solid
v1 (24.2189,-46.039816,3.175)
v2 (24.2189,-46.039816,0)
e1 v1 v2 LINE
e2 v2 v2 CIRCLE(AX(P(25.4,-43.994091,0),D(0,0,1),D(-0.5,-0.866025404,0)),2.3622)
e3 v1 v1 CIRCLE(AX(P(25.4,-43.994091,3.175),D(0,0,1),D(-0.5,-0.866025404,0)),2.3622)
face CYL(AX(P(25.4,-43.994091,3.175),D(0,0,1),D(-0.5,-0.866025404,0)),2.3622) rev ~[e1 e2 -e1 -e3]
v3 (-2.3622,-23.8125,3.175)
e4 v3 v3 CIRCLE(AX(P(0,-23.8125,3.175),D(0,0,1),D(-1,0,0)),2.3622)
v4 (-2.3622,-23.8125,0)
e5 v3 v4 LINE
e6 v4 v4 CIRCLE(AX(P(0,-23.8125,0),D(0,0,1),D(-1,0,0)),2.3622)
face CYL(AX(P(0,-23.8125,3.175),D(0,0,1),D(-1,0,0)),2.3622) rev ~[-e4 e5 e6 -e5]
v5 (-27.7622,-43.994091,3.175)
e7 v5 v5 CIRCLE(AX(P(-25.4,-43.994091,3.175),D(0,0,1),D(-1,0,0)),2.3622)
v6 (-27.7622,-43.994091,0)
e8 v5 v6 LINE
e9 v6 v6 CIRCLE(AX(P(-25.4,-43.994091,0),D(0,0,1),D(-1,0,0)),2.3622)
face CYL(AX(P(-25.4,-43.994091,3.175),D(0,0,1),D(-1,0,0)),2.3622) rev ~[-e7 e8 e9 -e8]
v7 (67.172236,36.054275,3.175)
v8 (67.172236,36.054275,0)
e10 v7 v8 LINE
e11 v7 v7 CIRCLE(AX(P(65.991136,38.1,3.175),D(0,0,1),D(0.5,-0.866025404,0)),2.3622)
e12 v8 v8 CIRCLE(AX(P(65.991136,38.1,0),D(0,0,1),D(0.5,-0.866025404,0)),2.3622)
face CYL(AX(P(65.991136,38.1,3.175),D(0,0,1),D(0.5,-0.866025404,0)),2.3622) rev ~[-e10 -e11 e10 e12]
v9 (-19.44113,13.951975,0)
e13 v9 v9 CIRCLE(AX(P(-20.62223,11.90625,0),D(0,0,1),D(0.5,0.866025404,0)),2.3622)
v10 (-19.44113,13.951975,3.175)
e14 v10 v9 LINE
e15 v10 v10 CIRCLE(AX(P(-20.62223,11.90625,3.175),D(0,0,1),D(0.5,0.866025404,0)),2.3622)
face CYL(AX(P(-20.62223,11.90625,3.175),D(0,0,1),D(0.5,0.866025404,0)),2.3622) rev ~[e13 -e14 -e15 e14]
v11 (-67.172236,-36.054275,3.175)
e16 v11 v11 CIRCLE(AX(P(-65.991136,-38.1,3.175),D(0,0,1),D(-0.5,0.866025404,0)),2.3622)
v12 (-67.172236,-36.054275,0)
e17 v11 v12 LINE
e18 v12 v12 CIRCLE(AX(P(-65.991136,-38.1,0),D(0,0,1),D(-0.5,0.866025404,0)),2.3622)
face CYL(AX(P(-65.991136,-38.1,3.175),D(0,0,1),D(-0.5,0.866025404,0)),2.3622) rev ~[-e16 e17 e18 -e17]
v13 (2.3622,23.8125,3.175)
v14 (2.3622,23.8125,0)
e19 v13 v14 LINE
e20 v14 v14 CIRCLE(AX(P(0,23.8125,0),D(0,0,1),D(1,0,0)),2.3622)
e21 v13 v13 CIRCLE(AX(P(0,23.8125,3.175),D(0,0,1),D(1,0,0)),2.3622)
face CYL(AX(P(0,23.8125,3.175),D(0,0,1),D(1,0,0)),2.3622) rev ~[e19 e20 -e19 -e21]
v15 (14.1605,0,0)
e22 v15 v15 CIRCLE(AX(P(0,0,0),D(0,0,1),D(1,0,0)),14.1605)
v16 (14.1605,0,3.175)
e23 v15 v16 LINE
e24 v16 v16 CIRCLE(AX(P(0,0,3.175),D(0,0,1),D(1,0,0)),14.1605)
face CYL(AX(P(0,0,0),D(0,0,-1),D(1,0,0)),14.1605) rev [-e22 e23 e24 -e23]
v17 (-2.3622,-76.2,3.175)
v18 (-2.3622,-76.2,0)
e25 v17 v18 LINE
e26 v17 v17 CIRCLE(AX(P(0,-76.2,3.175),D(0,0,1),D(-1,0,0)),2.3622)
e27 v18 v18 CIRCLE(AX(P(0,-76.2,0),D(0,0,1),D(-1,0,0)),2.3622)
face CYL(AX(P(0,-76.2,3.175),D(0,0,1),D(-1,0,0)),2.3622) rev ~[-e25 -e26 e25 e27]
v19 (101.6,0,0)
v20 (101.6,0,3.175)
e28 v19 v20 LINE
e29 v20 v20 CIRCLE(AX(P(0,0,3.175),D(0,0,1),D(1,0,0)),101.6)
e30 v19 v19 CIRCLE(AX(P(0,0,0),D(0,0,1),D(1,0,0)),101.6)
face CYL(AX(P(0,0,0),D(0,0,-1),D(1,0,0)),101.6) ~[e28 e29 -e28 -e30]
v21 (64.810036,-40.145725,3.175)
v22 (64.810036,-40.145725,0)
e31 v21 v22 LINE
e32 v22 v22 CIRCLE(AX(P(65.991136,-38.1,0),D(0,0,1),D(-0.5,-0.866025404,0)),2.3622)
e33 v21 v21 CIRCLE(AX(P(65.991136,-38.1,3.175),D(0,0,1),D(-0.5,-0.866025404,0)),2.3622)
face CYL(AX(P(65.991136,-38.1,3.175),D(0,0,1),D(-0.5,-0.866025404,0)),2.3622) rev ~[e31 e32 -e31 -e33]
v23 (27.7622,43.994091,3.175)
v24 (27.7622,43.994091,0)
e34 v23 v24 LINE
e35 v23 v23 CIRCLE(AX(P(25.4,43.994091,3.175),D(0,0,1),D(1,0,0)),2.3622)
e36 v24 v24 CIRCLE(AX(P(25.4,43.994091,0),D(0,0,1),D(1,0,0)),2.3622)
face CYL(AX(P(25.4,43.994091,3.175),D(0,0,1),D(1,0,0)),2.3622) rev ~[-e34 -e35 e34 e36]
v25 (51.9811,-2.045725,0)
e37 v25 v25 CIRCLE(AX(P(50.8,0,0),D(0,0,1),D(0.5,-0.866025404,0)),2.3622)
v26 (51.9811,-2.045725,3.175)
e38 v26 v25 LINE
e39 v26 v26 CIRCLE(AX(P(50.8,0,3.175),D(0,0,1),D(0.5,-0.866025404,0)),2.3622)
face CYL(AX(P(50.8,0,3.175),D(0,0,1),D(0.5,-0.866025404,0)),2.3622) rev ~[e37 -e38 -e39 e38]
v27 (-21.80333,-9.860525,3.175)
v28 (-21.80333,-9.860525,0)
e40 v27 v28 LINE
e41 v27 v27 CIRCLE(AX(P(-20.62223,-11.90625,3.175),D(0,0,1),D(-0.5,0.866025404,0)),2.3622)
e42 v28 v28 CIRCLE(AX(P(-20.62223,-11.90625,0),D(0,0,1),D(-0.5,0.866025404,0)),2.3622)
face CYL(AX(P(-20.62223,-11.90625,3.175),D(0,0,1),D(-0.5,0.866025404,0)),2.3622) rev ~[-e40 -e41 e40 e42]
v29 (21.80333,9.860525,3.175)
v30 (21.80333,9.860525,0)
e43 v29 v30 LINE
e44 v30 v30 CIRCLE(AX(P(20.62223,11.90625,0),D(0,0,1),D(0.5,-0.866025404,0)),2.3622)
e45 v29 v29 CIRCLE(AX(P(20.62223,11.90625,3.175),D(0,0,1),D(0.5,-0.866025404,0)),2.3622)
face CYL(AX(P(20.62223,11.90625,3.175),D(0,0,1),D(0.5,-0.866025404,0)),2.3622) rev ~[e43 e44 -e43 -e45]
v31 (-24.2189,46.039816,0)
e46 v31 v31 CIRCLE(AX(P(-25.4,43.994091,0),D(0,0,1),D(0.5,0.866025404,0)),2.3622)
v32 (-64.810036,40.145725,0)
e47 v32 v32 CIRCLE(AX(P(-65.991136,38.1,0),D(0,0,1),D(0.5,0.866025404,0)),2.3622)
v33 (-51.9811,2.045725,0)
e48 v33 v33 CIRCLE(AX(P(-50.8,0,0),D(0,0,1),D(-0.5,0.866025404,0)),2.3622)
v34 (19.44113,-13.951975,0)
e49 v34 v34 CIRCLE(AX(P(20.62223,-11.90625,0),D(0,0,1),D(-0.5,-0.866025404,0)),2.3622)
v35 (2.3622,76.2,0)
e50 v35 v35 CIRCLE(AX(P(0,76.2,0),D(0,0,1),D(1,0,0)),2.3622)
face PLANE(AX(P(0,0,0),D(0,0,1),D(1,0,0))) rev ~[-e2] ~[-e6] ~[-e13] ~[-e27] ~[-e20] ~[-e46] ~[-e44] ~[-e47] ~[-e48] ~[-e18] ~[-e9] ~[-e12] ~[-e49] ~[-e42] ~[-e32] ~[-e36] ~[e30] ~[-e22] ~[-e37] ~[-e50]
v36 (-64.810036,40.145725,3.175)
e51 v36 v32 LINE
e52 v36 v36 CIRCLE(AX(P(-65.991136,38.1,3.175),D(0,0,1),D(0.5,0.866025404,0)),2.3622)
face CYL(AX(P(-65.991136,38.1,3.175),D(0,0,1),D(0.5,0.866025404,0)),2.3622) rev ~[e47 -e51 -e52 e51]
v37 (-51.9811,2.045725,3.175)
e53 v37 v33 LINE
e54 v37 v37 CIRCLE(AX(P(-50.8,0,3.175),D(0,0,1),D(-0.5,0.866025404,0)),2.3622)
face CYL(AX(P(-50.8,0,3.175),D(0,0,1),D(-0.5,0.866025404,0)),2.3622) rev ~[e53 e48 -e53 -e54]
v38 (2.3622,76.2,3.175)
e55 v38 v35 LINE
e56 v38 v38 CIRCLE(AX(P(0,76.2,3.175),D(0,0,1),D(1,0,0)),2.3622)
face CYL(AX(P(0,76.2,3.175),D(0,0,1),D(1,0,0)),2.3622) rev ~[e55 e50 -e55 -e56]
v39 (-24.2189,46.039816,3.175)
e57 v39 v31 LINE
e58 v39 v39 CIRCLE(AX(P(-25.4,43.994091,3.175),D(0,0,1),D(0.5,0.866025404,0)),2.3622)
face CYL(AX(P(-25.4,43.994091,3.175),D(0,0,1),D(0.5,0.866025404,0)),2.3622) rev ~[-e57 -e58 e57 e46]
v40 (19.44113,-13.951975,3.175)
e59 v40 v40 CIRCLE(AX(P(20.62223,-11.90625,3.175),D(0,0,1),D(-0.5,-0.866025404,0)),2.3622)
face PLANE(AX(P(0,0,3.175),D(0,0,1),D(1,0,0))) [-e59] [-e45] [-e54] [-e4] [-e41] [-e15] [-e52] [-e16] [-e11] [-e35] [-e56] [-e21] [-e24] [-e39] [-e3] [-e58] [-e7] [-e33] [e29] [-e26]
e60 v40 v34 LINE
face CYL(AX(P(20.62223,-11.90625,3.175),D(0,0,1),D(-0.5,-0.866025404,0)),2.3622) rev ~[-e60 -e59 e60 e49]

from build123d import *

# Parameters (mm, degrees)
F0_R            = 101.6
F0_R_2          = 14.1605
F1_DEPTH        = 3.175
F2_R            = 2.3622
F3_DEPTH        = 3.176
F3_COPIES_COUNT = 6


# Not quite as in the source:
# - a pattern or mirror of a feature is missing from the dataset's text; its kind, count and spacing are read off the source's solid


with BuildPart() as f1:
    # F0 (on Top) → F1 (new body)
    with BuildSketch(Plane.XY):
        Circle(F0_R)
        Circle(F0_R_2, mode=Mode.SUBTRACT)
    extrude(amount=F1_DEPTH)

    # F2 (on face) → F3 (cut, through all)
    with BuildSketch(Plane.XY.offset(3.175)):
        with Locations((0, 23.8125)):
            Circle(F2_R)
        with Locations((0, 76.2)):
            Circle(F2_R)
        with Locations((25.4, 43.9940905122)):
            Circle(F2_R)
    f3 = extrude(amount=-F3_DEPTH, mode=Mode.SUBTRACT)

    # F3_copies: F3 ×6 about axis
    f3_copies_axis = Axis((0, 0, 0), (0, 0, 1))
    for i in range(1, F3_COPIES_COUNT):
        add(f3.rotate(f3_copies_axis, i * 360 / F3_COPIES_COUNT), mode=Mode.SUBTRACT)


solid = f1.part
